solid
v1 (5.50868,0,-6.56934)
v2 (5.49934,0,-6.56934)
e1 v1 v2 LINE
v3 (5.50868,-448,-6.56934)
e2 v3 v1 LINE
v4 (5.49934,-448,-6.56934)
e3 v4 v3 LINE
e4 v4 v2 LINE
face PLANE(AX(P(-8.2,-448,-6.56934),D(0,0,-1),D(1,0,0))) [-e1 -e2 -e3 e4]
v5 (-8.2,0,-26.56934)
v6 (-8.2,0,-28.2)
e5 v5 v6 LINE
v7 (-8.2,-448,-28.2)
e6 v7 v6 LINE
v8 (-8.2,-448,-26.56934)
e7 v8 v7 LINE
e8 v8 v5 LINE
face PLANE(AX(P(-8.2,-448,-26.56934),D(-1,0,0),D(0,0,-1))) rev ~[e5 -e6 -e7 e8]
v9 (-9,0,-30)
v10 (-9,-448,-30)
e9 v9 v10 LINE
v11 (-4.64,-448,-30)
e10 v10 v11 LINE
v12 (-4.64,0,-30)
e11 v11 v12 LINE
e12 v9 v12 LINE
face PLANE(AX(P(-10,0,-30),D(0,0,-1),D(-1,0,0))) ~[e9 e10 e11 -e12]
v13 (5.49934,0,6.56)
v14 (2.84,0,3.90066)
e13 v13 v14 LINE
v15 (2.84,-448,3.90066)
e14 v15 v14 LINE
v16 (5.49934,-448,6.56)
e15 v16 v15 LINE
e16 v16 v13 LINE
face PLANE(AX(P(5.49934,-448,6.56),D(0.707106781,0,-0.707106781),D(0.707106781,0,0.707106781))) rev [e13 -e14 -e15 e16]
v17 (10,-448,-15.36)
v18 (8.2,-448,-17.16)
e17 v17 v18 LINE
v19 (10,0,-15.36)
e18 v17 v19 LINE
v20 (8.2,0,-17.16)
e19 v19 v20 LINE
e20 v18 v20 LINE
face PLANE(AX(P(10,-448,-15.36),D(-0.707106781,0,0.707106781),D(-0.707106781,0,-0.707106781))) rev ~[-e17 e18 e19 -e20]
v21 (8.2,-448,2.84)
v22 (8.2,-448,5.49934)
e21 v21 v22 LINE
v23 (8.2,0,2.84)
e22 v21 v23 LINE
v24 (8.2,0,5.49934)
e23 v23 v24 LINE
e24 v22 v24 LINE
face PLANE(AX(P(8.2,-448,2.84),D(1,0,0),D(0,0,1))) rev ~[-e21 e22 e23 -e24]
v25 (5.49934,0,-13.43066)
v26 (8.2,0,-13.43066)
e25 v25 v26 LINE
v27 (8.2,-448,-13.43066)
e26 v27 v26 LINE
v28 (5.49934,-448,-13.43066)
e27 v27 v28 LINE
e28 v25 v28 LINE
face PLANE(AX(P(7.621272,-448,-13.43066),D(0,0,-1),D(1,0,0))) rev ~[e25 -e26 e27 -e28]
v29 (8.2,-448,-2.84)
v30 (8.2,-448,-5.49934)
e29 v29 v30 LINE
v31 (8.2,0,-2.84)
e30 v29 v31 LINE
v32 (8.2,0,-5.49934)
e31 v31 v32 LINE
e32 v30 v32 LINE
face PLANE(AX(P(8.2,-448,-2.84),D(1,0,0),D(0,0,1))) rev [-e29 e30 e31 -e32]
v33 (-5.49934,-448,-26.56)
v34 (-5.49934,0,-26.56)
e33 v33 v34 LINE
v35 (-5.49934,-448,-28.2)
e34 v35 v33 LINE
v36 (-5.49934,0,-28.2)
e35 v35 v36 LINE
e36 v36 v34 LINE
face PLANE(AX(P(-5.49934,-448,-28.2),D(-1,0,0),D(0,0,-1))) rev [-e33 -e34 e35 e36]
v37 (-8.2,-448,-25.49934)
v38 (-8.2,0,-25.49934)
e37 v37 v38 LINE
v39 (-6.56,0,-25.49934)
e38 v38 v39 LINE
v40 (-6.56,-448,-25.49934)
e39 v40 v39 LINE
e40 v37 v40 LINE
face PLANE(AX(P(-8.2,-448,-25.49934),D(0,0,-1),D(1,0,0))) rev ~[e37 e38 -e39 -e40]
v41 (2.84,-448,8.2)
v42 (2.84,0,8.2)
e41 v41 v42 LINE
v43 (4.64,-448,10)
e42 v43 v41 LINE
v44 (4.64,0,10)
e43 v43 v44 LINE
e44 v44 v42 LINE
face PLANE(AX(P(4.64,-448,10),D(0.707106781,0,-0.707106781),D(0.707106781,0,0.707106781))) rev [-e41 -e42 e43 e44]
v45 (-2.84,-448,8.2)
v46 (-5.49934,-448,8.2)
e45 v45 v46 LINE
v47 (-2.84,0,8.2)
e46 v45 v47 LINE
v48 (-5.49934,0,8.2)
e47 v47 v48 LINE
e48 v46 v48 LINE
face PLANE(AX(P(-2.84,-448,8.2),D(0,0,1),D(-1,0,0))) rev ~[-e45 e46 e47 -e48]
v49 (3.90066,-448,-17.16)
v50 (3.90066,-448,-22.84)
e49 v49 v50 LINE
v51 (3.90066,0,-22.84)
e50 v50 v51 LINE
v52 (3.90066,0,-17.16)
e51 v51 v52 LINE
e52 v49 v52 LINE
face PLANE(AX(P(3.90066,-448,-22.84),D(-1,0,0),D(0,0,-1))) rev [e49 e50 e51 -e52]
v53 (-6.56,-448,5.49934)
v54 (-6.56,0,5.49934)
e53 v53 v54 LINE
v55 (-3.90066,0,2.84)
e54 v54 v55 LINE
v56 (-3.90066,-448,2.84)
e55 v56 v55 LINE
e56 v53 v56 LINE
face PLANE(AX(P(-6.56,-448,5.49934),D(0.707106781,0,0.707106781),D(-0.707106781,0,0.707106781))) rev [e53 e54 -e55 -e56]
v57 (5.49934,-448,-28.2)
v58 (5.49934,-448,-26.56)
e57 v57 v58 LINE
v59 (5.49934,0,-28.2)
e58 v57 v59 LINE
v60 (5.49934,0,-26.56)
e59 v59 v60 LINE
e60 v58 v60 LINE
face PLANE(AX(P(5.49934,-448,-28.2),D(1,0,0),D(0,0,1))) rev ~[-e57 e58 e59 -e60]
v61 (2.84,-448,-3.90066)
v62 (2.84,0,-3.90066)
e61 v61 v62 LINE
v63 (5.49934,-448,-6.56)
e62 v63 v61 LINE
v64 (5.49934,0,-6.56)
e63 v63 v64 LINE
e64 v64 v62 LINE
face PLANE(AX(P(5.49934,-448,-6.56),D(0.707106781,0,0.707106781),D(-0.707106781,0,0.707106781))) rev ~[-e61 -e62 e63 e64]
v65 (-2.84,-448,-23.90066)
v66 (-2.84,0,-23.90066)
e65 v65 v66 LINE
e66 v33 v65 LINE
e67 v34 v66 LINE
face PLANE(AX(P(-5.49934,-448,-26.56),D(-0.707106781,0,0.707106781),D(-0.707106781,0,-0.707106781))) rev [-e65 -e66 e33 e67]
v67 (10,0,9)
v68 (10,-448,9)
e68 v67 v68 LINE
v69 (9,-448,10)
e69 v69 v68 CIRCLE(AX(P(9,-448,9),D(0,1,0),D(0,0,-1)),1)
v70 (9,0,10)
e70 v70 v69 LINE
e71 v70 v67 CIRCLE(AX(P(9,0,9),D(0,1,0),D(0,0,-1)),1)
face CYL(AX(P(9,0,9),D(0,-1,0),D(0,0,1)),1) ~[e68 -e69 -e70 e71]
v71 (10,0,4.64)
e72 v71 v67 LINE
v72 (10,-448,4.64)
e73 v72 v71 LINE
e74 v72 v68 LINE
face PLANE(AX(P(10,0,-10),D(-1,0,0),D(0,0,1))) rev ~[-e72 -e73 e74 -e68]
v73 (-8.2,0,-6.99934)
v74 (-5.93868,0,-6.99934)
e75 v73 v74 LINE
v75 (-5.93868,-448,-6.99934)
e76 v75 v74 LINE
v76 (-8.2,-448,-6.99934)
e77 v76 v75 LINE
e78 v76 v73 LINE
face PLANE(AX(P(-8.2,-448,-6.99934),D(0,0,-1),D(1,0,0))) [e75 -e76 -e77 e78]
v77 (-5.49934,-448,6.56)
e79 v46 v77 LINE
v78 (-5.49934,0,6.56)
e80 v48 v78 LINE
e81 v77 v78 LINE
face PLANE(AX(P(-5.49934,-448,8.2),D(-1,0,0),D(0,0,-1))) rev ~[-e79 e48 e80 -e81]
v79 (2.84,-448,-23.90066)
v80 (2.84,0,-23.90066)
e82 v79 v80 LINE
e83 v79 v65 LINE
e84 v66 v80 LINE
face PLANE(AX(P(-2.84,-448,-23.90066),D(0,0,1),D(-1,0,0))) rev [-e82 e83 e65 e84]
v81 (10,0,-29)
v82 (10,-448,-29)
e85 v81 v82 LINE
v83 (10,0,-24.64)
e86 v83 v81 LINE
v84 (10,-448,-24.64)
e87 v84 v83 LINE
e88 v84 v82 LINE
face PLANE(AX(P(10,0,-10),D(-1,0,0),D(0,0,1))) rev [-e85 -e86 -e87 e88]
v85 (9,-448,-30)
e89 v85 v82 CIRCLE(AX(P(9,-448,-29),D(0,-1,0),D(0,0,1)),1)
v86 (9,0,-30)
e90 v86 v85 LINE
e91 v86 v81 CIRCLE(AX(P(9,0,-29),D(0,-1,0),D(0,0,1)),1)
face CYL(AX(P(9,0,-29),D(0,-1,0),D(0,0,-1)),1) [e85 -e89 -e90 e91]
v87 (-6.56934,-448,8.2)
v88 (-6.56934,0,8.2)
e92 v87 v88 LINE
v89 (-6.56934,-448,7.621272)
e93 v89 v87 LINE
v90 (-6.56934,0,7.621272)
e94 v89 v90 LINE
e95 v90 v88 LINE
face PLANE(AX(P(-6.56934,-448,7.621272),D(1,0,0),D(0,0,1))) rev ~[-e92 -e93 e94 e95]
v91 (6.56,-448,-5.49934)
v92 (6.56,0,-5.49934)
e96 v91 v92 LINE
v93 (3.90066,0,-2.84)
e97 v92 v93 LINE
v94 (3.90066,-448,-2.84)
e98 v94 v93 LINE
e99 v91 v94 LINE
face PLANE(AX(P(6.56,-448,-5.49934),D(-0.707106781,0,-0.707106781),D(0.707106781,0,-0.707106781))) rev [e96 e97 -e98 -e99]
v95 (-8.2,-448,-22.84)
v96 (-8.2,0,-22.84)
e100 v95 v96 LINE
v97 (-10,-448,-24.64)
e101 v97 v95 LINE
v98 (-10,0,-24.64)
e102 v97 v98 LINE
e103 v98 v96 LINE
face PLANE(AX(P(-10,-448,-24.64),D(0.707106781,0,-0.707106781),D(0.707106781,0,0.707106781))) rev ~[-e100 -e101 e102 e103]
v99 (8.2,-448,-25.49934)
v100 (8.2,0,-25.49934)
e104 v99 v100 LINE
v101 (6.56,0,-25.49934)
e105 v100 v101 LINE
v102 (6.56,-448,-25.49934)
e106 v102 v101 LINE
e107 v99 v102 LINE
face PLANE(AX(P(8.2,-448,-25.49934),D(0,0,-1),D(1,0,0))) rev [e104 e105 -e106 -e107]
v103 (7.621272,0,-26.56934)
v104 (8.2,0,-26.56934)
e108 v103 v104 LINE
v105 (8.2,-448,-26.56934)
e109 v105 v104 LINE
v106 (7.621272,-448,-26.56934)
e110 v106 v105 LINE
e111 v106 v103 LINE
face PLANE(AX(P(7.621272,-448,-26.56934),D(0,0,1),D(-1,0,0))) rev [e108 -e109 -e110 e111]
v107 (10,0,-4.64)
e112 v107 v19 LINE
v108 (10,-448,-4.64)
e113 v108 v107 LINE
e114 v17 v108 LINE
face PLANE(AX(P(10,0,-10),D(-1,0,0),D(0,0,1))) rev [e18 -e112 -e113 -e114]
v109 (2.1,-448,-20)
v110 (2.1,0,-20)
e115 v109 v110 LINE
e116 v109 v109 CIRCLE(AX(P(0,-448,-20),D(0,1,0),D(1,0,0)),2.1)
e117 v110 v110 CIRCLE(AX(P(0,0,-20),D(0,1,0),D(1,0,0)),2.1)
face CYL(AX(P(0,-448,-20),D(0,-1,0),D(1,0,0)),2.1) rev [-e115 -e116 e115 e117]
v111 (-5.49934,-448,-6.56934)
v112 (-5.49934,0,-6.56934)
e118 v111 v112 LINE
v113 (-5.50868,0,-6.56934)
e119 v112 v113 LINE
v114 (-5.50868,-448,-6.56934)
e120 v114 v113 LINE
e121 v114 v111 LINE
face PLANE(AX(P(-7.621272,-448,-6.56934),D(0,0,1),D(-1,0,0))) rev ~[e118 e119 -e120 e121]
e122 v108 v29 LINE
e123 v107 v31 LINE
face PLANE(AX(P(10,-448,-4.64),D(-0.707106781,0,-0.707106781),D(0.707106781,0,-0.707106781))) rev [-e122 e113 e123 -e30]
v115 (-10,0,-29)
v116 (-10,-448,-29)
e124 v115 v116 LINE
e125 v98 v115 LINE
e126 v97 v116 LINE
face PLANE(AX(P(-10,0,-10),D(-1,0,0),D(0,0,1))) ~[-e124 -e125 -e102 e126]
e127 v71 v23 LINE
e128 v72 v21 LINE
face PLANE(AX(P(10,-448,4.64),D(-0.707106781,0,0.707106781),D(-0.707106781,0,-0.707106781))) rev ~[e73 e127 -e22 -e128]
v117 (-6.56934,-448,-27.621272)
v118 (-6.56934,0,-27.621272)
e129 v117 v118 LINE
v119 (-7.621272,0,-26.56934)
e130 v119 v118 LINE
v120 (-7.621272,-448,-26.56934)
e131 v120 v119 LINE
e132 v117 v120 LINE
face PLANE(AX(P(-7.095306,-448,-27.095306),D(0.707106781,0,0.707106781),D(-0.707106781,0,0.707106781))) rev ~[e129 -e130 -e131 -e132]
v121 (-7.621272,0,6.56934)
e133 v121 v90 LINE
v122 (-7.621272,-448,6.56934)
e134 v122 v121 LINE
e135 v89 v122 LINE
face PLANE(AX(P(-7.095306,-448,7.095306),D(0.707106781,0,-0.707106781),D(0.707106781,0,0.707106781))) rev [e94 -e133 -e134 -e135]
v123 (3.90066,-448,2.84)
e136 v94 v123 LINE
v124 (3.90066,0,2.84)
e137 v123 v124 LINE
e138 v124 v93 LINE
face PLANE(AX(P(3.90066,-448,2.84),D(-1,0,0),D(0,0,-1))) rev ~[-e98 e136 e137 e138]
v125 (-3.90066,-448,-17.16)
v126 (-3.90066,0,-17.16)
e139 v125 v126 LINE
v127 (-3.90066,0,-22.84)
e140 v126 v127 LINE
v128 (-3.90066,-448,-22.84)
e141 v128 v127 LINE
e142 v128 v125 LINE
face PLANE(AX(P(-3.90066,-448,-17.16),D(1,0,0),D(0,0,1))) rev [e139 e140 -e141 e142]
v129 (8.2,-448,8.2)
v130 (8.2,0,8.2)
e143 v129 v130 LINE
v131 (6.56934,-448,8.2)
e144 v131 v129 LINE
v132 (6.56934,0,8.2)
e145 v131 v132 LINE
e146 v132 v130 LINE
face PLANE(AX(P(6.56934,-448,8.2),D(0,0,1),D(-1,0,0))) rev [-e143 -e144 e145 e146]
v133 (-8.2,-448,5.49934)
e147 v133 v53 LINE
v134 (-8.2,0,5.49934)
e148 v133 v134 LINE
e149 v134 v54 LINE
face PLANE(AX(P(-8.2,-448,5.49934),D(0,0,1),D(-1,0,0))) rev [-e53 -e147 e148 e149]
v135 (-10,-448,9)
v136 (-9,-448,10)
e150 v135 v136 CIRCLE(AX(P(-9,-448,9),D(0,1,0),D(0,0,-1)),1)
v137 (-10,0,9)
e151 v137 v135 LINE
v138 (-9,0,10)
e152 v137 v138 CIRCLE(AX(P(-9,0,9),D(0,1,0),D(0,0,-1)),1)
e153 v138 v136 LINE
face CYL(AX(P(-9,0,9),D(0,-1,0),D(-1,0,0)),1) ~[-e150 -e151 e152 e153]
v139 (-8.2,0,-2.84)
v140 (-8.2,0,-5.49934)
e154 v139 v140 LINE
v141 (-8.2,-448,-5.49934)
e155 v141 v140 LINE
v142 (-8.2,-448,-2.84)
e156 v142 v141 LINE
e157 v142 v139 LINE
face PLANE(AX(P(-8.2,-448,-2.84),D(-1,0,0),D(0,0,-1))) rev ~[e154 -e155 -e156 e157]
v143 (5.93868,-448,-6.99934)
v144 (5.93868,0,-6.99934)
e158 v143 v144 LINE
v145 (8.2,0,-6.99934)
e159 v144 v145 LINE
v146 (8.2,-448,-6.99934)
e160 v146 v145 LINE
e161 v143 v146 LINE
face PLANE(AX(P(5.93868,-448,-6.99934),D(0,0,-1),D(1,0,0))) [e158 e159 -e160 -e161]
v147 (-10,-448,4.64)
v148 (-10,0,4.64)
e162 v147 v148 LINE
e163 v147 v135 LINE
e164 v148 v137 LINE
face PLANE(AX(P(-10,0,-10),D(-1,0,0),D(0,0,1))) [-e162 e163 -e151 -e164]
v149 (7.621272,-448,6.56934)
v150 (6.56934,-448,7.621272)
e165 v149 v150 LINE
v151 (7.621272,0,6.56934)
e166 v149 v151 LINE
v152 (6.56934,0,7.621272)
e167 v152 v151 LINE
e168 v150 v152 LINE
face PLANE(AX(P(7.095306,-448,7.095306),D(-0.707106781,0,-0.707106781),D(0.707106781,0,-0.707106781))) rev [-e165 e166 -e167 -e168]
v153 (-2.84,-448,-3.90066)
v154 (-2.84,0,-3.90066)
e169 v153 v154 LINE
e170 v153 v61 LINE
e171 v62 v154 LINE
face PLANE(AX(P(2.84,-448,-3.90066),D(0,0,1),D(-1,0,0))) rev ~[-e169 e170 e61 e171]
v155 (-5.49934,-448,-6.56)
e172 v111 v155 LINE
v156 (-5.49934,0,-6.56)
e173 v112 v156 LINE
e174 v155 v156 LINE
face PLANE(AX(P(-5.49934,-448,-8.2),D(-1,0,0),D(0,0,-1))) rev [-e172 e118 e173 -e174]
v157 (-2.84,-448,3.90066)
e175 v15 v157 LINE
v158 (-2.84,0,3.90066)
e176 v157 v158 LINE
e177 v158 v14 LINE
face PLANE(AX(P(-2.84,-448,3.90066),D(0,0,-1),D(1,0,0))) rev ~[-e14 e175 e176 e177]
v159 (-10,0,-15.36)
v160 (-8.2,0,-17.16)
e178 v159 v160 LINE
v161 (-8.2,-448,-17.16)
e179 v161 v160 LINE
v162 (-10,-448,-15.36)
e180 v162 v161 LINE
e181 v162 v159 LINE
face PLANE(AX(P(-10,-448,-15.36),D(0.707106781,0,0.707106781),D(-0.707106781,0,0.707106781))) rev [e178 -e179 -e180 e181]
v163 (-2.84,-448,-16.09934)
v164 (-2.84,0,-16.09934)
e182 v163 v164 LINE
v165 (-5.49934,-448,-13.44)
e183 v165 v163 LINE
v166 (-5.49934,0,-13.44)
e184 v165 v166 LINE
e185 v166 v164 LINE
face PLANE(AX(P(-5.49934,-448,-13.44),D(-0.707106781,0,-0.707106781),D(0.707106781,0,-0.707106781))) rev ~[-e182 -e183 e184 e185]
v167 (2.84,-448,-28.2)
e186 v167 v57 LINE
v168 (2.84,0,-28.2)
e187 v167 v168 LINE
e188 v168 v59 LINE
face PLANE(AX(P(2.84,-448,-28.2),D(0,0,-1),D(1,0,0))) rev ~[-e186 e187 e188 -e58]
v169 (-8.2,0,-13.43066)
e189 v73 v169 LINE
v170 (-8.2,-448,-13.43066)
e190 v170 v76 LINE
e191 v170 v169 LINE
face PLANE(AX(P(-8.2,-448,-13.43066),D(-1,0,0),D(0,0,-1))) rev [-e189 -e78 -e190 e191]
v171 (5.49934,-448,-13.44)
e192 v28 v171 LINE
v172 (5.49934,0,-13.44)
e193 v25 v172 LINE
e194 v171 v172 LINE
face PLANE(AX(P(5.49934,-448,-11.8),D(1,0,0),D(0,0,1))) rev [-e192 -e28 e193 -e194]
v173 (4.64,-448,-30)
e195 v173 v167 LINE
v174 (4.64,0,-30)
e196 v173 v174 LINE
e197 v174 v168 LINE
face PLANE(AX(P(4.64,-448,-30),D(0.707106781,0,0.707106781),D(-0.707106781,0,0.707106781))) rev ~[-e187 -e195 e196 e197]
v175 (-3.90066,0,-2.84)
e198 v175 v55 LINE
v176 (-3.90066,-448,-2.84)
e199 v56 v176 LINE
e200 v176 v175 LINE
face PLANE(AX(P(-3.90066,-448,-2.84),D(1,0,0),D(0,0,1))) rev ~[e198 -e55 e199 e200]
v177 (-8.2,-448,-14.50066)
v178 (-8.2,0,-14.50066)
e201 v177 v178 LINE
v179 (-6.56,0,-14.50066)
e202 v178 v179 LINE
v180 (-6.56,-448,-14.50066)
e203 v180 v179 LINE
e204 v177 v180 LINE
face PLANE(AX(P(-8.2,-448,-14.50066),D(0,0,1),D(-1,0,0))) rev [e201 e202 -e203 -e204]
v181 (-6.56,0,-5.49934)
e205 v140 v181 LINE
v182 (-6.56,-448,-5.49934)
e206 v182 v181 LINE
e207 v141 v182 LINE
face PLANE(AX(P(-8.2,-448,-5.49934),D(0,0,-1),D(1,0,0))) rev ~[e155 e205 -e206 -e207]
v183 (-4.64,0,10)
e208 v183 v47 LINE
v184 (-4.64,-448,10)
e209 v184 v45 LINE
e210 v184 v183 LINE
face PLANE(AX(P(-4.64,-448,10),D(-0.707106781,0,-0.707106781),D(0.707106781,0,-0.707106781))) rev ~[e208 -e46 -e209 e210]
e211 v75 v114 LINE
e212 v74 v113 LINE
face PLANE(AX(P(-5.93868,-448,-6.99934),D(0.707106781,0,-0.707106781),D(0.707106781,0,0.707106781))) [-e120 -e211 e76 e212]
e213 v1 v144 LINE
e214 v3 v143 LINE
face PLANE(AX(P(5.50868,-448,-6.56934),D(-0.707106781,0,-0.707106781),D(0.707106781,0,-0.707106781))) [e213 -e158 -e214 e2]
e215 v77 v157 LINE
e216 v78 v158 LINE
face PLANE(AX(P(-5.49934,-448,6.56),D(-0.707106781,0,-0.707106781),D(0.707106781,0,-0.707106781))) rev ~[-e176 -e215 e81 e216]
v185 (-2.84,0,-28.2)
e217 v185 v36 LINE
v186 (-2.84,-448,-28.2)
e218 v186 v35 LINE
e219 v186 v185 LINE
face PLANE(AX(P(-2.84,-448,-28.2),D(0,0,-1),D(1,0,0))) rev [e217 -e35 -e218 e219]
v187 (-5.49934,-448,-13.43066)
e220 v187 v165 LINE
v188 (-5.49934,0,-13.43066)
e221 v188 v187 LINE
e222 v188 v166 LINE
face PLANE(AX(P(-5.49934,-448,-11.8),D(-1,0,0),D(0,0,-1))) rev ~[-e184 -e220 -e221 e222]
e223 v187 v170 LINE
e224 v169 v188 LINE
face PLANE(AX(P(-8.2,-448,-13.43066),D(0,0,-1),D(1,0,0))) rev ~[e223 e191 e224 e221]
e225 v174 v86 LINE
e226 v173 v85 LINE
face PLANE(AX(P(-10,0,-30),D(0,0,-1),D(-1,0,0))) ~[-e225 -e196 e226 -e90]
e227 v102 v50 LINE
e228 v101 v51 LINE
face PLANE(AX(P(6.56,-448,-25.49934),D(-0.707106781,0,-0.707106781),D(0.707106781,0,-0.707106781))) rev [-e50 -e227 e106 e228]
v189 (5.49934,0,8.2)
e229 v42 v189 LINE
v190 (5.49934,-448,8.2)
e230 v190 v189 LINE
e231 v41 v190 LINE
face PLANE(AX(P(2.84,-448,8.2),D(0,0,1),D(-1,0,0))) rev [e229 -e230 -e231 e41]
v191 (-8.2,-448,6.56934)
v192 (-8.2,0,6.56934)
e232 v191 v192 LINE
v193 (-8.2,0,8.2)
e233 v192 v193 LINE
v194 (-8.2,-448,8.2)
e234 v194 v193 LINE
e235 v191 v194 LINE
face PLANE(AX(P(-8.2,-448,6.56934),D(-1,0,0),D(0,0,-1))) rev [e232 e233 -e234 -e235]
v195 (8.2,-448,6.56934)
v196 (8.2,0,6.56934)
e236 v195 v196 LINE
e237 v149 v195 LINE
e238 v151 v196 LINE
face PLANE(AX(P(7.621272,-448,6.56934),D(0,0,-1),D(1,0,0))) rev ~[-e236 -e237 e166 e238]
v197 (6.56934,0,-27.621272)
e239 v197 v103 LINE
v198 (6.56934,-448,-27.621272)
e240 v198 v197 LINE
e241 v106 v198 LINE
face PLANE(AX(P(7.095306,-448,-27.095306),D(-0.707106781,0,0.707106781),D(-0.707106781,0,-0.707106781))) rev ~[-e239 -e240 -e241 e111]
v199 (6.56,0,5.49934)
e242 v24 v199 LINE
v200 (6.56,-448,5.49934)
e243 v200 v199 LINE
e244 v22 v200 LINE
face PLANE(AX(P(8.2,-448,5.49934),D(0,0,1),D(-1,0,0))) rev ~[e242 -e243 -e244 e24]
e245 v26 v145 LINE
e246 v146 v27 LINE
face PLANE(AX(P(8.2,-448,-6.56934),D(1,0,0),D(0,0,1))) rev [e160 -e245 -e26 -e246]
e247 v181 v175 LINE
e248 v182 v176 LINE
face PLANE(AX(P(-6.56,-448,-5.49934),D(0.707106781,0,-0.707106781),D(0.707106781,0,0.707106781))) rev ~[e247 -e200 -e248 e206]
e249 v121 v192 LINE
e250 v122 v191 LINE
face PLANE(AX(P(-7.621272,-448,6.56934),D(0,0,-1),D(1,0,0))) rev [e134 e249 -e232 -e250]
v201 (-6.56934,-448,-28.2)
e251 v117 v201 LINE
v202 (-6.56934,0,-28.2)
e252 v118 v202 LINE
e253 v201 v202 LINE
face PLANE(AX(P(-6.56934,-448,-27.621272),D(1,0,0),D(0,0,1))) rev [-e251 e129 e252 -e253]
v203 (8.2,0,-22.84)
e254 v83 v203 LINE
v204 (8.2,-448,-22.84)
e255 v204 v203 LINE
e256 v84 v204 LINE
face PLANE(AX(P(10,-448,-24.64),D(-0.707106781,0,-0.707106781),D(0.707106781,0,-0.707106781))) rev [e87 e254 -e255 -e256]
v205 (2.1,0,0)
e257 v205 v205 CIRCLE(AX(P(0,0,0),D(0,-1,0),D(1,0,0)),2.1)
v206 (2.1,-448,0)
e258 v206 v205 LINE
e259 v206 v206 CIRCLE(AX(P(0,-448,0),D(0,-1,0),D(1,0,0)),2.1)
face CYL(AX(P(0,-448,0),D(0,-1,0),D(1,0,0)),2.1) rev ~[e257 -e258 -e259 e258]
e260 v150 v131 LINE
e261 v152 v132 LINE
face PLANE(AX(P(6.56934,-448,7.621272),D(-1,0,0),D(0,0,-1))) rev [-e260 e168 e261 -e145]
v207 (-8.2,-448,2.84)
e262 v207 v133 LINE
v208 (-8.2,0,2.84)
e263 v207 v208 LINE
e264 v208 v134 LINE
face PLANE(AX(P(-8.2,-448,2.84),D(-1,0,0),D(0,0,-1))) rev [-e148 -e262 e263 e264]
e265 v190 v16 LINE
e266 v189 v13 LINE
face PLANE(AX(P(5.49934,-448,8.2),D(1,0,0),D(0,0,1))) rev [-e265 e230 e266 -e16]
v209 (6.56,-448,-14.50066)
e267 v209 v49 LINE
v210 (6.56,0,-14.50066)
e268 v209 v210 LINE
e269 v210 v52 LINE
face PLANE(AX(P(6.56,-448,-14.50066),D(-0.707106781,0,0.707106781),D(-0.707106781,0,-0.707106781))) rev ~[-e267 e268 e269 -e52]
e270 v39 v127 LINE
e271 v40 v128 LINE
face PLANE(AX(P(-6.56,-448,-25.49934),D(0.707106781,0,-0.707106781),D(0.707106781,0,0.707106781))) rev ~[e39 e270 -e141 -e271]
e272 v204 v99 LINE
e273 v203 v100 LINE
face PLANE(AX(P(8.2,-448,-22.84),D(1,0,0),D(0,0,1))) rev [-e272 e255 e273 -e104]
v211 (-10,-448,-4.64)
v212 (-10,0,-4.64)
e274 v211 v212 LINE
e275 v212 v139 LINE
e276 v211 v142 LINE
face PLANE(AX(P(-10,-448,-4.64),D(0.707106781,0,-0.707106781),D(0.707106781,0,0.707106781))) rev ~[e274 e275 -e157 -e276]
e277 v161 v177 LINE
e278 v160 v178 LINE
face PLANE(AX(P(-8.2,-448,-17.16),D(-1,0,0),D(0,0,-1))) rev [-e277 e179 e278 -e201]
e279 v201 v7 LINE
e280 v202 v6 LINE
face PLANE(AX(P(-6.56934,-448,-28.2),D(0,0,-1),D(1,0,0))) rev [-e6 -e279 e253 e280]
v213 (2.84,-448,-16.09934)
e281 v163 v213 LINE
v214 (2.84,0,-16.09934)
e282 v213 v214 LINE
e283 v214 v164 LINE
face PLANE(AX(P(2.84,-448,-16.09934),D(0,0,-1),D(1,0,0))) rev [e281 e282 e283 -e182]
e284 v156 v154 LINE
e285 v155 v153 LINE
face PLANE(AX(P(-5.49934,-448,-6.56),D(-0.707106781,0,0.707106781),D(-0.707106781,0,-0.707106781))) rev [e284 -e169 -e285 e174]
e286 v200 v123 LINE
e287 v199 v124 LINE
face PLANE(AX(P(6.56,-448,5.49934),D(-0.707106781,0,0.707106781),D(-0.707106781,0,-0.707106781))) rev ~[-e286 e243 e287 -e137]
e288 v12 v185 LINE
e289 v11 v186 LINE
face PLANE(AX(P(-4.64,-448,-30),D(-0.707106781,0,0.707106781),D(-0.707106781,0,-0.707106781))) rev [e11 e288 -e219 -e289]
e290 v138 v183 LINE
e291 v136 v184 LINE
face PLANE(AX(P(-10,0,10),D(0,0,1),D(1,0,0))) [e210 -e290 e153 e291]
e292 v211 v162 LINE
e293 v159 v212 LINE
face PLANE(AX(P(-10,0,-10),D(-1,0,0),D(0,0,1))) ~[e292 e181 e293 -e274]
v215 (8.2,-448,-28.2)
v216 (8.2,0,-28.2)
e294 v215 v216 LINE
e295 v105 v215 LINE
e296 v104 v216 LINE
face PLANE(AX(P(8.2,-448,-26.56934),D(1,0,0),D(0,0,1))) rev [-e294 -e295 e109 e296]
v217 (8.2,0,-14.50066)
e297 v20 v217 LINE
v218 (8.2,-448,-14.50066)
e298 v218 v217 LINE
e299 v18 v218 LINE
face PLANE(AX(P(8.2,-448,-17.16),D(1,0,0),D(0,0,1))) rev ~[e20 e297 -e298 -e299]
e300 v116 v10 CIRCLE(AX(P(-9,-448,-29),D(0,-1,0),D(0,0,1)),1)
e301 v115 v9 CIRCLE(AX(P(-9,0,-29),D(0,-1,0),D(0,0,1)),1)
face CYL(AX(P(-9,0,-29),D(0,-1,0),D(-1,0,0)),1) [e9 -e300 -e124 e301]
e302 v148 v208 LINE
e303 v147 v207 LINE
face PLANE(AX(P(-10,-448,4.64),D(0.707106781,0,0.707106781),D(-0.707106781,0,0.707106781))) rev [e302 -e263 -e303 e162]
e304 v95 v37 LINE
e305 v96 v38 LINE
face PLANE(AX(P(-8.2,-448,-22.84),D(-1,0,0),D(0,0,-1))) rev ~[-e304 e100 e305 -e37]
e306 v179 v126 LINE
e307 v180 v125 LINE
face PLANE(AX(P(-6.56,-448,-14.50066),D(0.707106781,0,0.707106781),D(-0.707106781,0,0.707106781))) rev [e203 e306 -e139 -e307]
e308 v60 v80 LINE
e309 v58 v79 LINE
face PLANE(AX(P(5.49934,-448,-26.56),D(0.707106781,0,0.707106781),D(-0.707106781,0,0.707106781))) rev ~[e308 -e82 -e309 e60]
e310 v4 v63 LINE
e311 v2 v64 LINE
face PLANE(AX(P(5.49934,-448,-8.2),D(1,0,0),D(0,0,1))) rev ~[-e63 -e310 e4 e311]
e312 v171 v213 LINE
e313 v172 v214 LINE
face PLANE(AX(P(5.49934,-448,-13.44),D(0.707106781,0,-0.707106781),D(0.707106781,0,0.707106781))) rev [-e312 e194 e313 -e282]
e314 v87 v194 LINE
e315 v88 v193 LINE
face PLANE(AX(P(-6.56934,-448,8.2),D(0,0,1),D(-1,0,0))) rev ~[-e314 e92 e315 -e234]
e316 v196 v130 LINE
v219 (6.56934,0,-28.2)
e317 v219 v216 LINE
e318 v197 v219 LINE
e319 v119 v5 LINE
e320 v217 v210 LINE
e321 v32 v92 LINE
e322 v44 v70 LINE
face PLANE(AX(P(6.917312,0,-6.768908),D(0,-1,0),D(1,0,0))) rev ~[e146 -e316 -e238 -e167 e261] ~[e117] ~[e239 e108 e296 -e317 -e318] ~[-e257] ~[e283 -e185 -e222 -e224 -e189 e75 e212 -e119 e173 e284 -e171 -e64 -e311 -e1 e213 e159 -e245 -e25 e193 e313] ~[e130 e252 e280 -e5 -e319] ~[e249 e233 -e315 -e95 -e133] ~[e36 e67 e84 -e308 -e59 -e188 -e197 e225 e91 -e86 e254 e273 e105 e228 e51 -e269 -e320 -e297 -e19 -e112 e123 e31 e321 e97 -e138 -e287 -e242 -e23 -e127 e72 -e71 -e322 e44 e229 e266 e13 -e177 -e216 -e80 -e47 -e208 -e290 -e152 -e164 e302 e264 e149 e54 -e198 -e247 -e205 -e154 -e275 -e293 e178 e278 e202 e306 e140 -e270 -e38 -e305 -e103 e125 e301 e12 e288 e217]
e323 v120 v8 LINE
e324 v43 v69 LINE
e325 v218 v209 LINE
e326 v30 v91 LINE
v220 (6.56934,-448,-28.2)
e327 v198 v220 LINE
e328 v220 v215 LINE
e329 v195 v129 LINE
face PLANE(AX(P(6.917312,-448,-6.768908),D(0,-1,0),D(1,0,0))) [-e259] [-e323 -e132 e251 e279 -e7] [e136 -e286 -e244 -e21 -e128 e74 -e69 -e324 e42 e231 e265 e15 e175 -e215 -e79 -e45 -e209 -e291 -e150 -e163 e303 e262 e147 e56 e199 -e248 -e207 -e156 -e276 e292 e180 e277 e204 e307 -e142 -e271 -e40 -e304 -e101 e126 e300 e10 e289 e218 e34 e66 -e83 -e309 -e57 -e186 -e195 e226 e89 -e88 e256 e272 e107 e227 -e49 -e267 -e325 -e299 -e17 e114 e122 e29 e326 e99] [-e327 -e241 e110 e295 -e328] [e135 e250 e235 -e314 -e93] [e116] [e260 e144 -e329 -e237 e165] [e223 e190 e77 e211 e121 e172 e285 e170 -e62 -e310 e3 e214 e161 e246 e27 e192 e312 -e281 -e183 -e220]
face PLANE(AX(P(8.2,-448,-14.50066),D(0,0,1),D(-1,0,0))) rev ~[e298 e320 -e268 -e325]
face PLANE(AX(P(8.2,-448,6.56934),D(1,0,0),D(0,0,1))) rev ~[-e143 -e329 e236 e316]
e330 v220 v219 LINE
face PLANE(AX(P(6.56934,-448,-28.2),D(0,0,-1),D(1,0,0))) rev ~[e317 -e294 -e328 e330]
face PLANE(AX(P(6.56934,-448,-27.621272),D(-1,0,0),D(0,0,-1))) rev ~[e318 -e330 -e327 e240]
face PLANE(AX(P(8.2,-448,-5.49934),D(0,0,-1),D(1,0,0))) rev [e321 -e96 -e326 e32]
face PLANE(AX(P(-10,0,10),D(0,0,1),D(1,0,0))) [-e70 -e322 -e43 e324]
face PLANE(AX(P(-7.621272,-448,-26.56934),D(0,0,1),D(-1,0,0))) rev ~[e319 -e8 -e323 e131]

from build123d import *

# Parameters (mm, degrees)
F0_W             = 20
F0_H             = 20
F1_DEPTH         = 448
F2_R             = 2.1
F3_DEPTH         = 448.001
F4_R             = 1
F6_DEPTH         = 448.001
F6_COPIES3_COUNT = 2
F6_COPIES3_ANGLE = 90
F6_COPIES4_COUNT = 2
F6_COPIES4_ANGLE = 270
F6_COPIES6_COUNT = 2
F9_W             = 16.4
F9_H             = 6.8613203436
F10_DEPTH        = 448.001
F12_DEPTH        = 448


# Not quite as in the source:
# - a pattern or mirror of a feature is missing from the dataset's text; its kind, count and spacing are read off the source's solid


with BuildPart() as f1:
    # F0 (on Front) → F1 (new body)
    with BuildSketch(Plane.XZ):
        Rectangle(F0_W, F0_H)
    extrude(amount=F1_DEPTH)

    # F2 (on face) → F3 (cut, through all)
    with BuildSketch(Plane.XZ.offset(448)):
        Circle(F2_R)
    extrude(amount=-F3_DEPTH, mode=Mode.SUBTRACT)

    # F4
    f4_edges = [f1.edges().sort_by_distance(p)[0] for p in [
        (-10, -224, 10),
        (10, -224, 10),
    ]]
    fillet(f4_edges, radius=F4_R)

    # F5 (on face) → F6 (cut, through all)
    with BuildSketch(Plane.XZ.offset(448)):
        Polygon((0, 3.9006601718), (0, 10), (-2.84, 10), (-4.64, 10), (-2.84, 8.2), (-5.4993398282, 8.2), (-5.4993398282, 6.56), (-2.84, 3.9006601718), align=None)
        Polygon((-6.5693398282, 8.2), (-8.2, 8.2), (-7.0953059148, 7.0953059148), (-6.5693398282, 7.6212720014), align=None)
    f6 = extrude(amount=-F6_DEPTH, mode=Mode.SUBTRACT)

    # F6_copies: F6 across plane
    add(f6.mirror(Plane(origin=(0, 0, 0), x_dir=(-0.7071067812, 0, -0.7071067812), z_dir=(0.7071067812, 0, -0.7071067812))), mode=Mode.SUBTRACT)

    # F6_copies1: F6 across plane
    add(f6.mirror(Plane(origin=(0, 0, 0), x_dir=(0.7071067812, 0, -0.7071067812), z_dir=(-0.7071067812, 0, -0.7071067812))), mode=Mode.SUBTRACT)

    # F6_copies2: F6 across plane
    add(f6.mirror(Plane(origin=(0, 0, 0), x_dir=(0, 0, 1), z_dir=(1, 0, 0))), mode=Mode.SUBTRACT)

    # F6_copies3: F6 ×2 about axis
    f6_copies3_axis = Axis((0, 0, 0), (0, 1, 0))
    for i in range(1, F6_COPIES3_COUNT):
        add(f6.rotate(f6_copies3_axis, i * F6_COPIES3_ANGLE / (F6_COPIES3_COUNT - 1)), mode=Mode.SUBTRACT)

    # F6_copies4: F6 ×2 about axis
    f6_copies4_axis = Axis((0, 0, 0), (0, 1, 0))
    for i in range(1, F6_COPIES4_COUNT):
        add(f6.rotate(f6_copies4_axis, i * F6_COPIES4_ANGLE / (F6_COPIES4_COUNT - 1)), mode=Mode.SUBTRACT)

    # F6_copies5: F6 across plane
    add(f6.mirror(Plane(origin=(0, 0, 0), x_dir=(-1, 0, 0), z_dir=(0, 0, -1))), mode=Mode.SUBTRACT)

    # F6_copies6: F6 ×2 about axis
    f6_copies6_axis = Axis((0, 0, 0), (0, 1, 0))
    for i in range(1, F6_COPIES6_COUNT):
        add(f6.rotate(f6_copies6_axis, i * 360 / F6_COPIES6_COUNT), mode=Mode.SUBTRACT)

    # F8: F1 across face


with BuildPart() as f1_1:
    add(f1.part)
    add(f1.part.mirror(Plane(origin=(-7.32, -224, -10), x_dir=(1, 0, 0), z_dir=(0, 0, -1))))

    # F9 (on face) → F10 (cut, through all)
    with BuildSketch(Plane.XZ.offset(448)):
        with Locations((0, -10)):
            Rectangle(F9_W, F9_H)
    extrude(amount=-F10_DEPTH, mode=Mode.SUBTRACT)

    # F11 (on face) → F12 (join, through all)
    with BuildSketch(Plane.XZ.offset(448)):
        with BuildLine():
            ThreePointArc((-9, -10), (-9.7071067812, -9.7071067812), (-10, -9))
            Line((-10, -9), (-10, -11))
            ThreePointArc((-10, -11), (-9.7071067812, -10.2928932188), (-9, -10))
        make_face()
        with BuildLine():
            ThreePointArc((10, -9), (9.7071067812, -9.7071067812), (9, -10))
            ThreePointArc((9, -10), (9.7071067812, -10.2928932188), (10, -11))
            Line((10, -11), (10, -9))
        make_face()
        Polygon((5.9386796564, -6.9993398282), (8.2, -6.9993398282), (8.2, -6.5693398282), (5.5086796564, -6.5693398282), align=None)
        Polygon((-8.2, -6.5693398282), (-8.2, -6.9993398282), (-5.9386796564, -6.9993398282), (-5.5086796564, -6.5693398282), align=None)
    extrude(amount=-F12_DEPTH)


solid = f1_1.part
